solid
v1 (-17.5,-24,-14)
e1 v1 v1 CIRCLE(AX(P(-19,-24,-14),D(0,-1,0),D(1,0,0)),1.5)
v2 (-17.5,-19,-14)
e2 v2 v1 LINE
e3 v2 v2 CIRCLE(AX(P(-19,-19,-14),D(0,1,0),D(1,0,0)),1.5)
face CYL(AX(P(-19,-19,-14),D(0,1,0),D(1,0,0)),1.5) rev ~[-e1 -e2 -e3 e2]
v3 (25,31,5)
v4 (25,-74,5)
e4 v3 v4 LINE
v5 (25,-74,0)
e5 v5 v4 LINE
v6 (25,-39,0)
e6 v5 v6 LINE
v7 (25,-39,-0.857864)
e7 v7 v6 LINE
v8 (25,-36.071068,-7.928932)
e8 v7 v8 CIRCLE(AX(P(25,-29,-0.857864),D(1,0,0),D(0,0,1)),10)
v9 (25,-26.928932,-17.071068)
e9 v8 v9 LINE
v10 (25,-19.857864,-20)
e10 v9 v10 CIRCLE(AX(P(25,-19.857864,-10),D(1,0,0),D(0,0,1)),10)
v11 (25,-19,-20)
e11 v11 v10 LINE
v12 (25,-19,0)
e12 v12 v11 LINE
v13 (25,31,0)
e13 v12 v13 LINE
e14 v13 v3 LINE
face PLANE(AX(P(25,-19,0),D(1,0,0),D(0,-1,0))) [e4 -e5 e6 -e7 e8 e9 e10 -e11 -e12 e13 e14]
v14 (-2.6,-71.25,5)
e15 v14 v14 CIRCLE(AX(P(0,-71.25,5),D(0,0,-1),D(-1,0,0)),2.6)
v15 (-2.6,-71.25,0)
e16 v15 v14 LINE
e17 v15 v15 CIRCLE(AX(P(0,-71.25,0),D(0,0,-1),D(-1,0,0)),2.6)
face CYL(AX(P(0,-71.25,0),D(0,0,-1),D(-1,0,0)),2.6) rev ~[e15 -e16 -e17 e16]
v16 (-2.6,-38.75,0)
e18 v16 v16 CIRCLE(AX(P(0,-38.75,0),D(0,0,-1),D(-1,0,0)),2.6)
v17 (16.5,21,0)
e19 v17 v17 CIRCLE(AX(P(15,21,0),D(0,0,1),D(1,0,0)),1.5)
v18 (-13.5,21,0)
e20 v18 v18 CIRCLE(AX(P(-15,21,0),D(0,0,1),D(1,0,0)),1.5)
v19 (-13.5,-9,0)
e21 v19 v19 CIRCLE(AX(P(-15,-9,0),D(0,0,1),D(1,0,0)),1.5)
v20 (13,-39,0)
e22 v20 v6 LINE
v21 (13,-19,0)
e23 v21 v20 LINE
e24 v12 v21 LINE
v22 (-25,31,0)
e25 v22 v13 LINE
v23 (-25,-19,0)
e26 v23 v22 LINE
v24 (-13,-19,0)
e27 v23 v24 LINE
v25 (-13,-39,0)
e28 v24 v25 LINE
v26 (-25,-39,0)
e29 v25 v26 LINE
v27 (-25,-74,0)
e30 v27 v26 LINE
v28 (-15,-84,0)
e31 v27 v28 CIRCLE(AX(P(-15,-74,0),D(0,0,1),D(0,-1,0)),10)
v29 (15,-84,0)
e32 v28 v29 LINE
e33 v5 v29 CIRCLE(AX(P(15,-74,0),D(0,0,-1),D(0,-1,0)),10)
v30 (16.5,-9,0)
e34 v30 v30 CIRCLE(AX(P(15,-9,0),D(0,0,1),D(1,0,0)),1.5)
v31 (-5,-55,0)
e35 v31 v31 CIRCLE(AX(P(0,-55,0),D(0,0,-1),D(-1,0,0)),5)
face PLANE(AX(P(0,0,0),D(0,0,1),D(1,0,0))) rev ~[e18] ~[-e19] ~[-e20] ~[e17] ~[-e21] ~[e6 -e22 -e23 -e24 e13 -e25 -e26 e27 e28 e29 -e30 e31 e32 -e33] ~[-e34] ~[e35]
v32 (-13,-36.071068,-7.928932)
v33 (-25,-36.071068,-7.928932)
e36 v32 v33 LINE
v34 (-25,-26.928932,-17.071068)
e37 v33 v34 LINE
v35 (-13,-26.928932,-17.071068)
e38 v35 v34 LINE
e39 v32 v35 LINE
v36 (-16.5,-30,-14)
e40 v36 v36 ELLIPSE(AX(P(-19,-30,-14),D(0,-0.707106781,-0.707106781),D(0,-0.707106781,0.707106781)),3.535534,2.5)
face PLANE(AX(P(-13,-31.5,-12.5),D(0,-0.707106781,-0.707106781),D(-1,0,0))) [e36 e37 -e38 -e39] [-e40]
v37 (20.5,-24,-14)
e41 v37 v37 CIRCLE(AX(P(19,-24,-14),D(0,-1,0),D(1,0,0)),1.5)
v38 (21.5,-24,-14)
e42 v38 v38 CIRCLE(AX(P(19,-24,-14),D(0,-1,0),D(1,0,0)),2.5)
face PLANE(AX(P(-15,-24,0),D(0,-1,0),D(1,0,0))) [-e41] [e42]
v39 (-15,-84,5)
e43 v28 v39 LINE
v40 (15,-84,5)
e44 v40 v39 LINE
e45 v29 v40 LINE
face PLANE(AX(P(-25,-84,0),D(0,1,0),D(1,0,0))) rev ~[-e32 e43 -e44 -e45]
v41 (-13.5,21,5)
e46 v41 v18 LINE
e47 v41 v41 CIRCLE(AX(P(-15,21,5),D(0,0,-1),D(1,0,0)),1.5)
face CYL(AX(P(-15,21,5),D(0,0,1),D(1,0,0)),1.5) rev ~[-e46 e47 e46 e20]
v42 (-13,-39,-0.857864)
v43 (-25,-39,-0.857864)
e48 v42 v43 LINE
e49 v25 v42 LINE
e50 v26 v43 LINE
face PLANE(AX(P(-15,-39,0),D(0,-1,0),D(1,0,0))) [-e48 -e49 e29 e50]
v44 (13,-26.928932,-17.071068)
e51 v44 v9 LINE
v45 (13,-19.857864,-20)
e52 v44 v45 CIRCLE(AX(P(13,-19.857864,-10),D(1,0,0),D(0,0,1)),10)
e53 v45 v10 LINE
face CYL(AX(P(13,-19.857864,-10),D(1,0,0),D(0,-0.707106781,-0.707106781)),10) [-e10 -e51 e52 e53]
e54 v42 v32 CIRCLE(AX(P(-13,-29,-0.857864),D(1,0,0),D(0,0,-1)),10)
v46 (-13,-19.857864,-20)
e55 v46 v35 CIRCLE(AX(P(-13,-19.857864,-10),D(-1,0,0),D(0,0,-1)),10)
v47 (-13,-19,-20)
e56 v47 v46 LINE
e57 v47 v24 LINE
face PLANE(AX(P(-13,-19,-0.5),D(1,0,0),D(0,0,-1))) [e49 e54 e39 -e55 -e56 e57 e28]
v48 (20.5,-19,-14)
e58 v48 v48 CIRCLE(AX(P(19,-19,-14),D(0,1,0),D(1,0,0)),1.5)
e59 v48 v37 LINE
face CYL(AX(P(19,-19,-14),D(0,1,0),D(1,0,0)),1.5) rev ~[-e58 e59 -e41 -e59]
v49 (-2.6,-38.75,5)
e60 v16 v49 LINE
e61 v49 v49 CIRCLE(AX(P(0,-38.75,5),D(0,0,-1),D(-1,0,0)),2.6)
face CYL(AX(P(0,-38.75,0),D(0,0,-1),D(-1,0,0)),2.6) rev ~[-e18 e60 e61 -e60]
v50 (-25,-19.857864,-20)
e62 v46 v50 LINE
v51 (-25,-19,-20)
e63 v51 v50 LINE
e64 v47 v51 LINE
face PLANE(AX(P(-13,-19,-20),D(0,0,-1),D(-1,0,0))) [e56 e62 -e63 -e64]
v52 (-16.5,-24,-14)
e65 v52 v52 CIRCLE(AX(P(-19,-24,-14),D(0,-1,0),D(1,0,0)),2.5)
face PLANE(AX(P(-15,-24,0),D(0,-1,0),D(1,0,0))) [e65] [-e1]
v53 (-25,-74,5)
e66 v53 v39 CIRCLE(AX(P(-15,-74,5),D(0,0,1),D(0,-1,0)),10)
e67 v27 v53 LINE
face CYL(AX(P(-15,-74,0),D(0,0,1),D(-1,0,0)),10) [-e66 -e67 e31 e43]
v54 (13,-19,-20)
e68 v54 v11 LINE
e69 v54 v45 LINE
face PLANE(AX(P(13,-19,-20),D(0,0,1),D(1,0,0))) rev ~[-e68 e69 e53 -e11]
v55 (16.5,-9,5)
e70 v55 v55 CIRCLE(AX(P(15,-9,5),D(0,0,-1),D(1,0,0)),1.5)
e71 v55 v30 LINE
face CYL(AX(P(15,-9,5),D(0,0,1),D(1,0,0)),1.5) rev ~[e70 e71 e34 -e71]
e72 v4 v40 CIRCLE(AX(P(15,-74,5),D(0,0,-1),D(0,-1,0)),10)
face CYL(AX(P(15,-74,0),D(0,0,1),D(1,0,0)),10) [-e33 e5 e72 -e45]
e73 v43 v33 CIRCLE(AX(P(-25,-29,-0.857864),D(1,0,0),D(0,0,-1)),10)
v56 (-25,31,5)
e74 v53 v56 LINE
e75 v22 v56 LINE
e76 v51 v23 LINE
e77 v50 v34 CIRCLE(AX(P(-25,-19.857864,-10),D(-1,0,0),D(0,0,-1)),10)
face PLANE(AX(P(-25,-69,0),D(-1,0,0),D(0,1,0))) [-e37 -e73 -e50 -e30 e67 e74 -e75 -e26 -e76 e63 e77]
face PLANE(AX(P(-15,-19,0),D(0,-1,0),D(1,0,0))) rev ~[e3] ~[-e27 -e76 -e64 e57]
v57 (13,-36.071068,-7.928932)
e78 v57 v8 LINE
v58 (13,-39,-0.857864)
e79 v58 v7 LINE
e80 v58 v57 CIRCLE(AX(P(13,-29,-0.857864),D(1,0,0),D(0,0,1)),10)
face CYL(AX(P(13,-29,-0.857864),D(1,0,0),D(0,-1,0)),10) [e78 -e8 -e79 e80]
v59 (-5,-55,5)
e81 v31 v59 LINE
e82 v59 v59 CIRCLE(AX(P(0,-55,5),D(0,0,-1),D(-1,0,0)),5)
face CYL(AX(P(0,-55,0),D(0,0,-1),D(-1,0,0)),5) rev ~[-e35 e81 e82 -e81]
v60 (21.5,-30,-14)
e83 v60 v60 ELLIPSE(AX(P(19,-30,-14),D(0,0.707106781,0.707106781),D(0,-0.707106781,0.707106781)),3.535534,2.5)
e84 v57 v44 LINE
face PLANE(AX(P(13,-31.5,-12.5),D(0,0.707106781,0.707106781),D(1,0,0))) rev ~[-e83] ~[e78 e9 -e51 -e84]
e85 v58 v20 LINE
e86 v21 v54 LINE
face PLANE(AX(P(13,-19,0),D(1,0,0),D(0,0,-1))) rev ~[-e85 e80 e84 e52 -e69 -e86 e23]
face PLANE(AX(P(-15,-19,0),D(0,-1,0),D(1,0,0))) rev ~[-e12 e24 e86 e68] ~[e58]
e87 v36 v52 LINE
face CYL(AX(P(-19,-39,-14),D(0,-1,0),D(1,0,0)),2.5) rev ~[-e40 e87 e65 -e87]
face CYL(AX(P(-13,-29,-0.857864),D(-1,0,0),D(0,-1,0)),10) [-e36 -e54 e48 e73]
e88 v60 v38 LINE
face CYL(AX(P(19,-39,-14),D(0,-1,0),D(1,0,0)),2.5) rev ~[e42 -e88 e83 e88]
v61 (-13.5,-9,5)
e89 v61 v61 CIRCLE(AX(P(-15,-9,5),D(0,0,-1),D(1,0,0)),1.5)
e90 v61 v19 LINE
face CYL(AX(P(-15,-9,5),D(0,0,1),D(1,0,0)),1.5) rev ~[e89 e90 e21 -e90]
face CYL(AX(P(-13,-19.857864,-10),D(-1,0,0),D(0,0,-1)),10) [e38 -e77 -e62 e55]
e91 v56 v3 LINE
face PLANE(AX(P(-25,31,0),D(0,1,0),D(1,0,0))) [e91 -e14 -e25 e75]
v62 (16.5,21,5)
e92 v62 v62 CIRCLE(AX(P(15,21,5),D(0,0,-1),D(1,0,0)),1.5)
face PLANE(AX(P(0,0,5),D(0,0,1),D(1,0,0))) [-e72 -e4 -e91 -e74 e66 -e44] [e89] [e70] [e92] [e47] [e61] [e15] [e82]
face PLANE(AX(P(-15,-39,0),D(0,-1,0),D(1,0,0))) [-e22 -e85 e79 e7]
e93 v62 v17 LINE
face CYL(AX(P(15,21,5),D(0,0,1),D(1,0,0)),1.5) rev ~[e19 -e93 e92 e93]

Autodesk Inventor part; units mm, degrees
ref_plane "YZ Plane" through (0, 0, 0) normal (1, 0, 0) x (0, 1, 0)
ref_plane "XZ Plane" through (0, 0, 0) normal (0, 1, 0) x (-1, 0, 0)
ref_plane "XY Plane" through (0, 0, 0) normal (0, 0, 1) x (1, 0, 0)
sketch "Sketch1" plane through (0, 0, 0) normal (0, 0, 1) x (1, 0, 0)
  line L0 (25, -19) -> (-25, -19) projected
  line L1 (-25, 31) -> (25, 31)
  line L2 (25, 31) -> (25, -69)
  line L3 (25, -69) -> (-25, -69)
  line L4 (-25, -69) -> (-25, 31)
  line L5 (-25, 31) -> (25, -69) construction
  line L6 (25, 31) -> (-25, -69) construction
  line L7 (25, -69) -> (-25, -69)
  line L8 (-25, -69) -> (-25, -119)
  line L9 (-25, -119) -> (25, -119)
  line L10 (25, -119) -> (25, -69)
  point P0 (0, 0)
  point P1 (0, -19)
  dimension "d0" = 50
  dimension "d1" = 100
  dimension "d2" = 50
  dimension "d3" = 50
extrude "Extrusion1" add sketch "Sketch1" along normal blind 5
fillet "Fillet1" radius 10 2 edges at (25, -119, 2.5) (-25, -119, 2.5)
ref_plane "Work Plane1" through (-15, -19, 0) normal (0, -1, 0) x (1, 0, 0)
sketch "Sketch2" plane through (-15, -19, 0) normal (0, -1, 0) x (1, 0, 0)
  line L0 (40, -0.5) -> (-10, -0.5) projected
  line L1 (-10, -0.5) -> (-10, -3.5) projected
  line L2 (40, -3.5) -> (-10, -3.5) projected
  line L3 (40, -0.5) -> (40, -3.5) projected
  line L4 (-10, -3.5) -> (40, -3.5) projected
  line L5 (-10, -3.5) -> (-10, -53.5) projected
  line L6 (-10, -53.5) -> (40, -53.5) projected
  line L7 (40, -53.5) -> (40, -3.5) projected
  line L8 (40, -3.5) -> (-10, -3.5) projected
  ellipse E0 centre (15, -28.5) end of major axis (18.5, -28.5) minor radius 3.5 projected
  line L9 (-10, 0) -> (0, 0) projected
  line L10 (40, 0) -> (-10, 0) projected
  line L11 (30, 0) -> (40, 0) projected
  line L12 (0, 0) -> (30, 0) projected
  line L13 (25, -0.5) -> (5, -0.5) projected
  line L14 (5, -0.5) -> (5, -20.5) projected
  line L15 (25, -20.5) -> (5, -20.5) projected
  line L16 (25, -0.5) -> (25, -20.5) projected
  line L17 (40, 0) -> (28, 0)
  line L18 (28, 0) -> (28, -20)
  line L19 (28, -20) -> (40, -20)
  line L20 (40, -20) -> (40, 0)
  line L21 (-10, 0) -> (2, 0)
  line L22 (2, 0) -> (2, -20)
  line L23 (2, -20) -> (-10, -20)
  line L24 (-10, -20) -> (-10, 0)
  point P0 (15, 0)
  dimension "d8" = 12
  dimension "d9" = 20
  dimension "d10" = 12
  dimension "d11" = 20
extrude "Extrusion2" add sketch "Sketch2" along normal blind 20 contours L18 L10 L20 L0 | L0 L3 L2 L18 | L22 L2 L1 L0 | L0 L24 L9 L10 L22 | L2 L7 L19 L18 | L22 L23 L5 L2
chamfer "Chamfer1" distance 15 angle 45 2 edges at (-19, -39, -20) (19, -39, -20)
fillet "Fillet2" radius 10 2 edges at (-19, -24, -20) (-19, -39, -5)
fillet "Fillet3" radius 10 2 edges at (19, -39, -5) (19, -24, -20)
sketch "Sketch3" plane through (0, 0, 5) normal (0, 0, 1) x (1, 0, 0)
  line L0 (25, -109) -> (25, 31) projected
  line L1 (-25, 31) -> (-25, -109) projected
  line L2 (25, 31) -> (-25, 31)
  line L3 (-25, 31) -> (-25, -19)
  line L4 (-25, -19) -> (25, -19)
  line L5 (25, -19) -> (25, 31)
  line L6 (-15, 51) -> (15, 51)
  line L7 (15, 51) -> (15, 21)
  line L8 (15, 21) -> (-15, 21)
  line L9 (-15, 21) -> (-15, 51)
  line L10 (-15, 51) -> (15, 21) construction
  line L11 (15, 51) -> (-15, 21) construction
  circle A0 centre (15, 21) radius 1.5
  circle A1 centre (15, 51) radius 1.5
  circle A2 centre (-15, 51) radius 1.5
  circle A3 centre (-15, 21) radius 1.5
  point P0 (0, 0)
  point P1 (0, 36)
  dimension "d19" = 50
  dimension "d20" = 30
  dimension "d21" = 30
  dimension "d22" = 3
  dimension "d23" = 3
  dimension "d24" = 3
  dimension "d25" = 3
extrude "Extrusion3" cut sketch "Sketch3" against normal blind 20 contours A1 L6 L7 | L7 L6 A1 | A0 L8 L7 | L7 L8 A0 | A3 L8 L9 | L9 L8 A3 | A2 L6 L9 | L9 L6 A2
sketch "Sketch4" plane through (-15, -19, 0) normal (0, 1, 0) x (1, 0, 0)
  line L0 (-10, 0) -> (-10, 20) projected
  line L1 (-10, 20) -> (2, 20)
  line L2 (2, 20) -> (2, 8)
  line L3 (2, 8) -> (-10, 8)
  line L4 (-10, 8) -> (-10, 20)
  circle A0 centre (-4, 14) radius 1.5
  circle A1 centre (34, 14) radius 1.5
  point P0 (15, 0)
  dimension "d28" = 12
  dimension "d29" = 12
  dimension "d30" = 3
  dimension "d33" = 38
extrude "Extrusion4" cut sketch "Sketch4" against normal through all contours A0 | A1
sketch "Sketch5" plane through (-15, -39, 0) normal (0, -1, 0) x (1, 0, 0)
  circle A0 centre (34, -14) radius 1.5 projected
  circle A1 centre (-4, -14) radius 1.5 projected
  circle A2 centre (34, -14) radius 2.5
  circle A3 centre (-4, -14) radius 1.5 projected
  circle A4 centre (-4, -14) radius 2.5
  point P0 (15, 0)
  dimension "d40" = 5
  dimension "d41" = 5
extrude "Extrusion5" cut sketch "Sketch5" against normal blind 15
sketch "Sketch6" plane through (0, 0, 0) normal (0, 0, -1) x (-1, 0, 0)
  circle A0 centre (0, -55) radius 5
  circle A1 centre (0, -38.75) radius 2.6
  circle A2 centre (0, -71.25) radius 2.6
  point P0 (0, 0)
  dimension "d44" = 10
  dimension "d45" = 16.25
  dimension "d46" = 16.25
  dimension "d47" = 5.2
  dimension "d48" = 5.2
  dimension "d51" = 55
extrude "Extrusion6" cut sketch "Sketch6" against normal blind 15
sketch "Sketch7" plane through (0, 0, 0) normal (0, 0, -1) x (-1, 0, 0)
  line L0 (25, 31) -> (25, -109) projected
  line L1 (25, -84) -> (-25, -84)
  line L2 (-25, -109) -> (-25, 31) projected
  line L3 (25, -84) -> (75, -84) construction
  line L4 (15, -119) -> (-15, -119) projected
  circle A0 centre (0, -71.25) radius 2.6 projected
  circle A1 centre (0, -38.75) radius 2.6 projected
  circle A2 centre (0, -55) radius 5 projected
  circle A3 centre (15, 21) radius 1.5 projected
  circle A4 centre (-15, 21) radius 1.5 projected
  line L5 (-13, -39) -> (-25, -39) projected
  line L6 (-25, -109) -> (-25, -39) projected
  arc A5 (-25, -109) -> (-15, -119) centre (-15, -109) ccw projected
  line L7 (15, -119) -> (-15, -119) projected
  arc A6 (15, -119) -> (25, -109) centre (15, -109) ccw projected
  line L8 (25, -39) -> (25, -109) projected
  line L9 (25, -39) -> (13, -39) projected
  line L10 (13, -39) -> (13, -19) projected
  line L11 (13, -19) -> (25, -19) projected
  line L12 (25, 31) -> (25, -19) projected
  line L13 (-25, 31) -> (25, 31) projected
  line L14 (-25, -19) -> (-25, 31) projected
  line L15 (-25, -19) -> (-13, -19) projected
  line L16 (-13, -19) -> (-13, -39) projected
  point P0 (0, 0)
  point P1 (-15, -119)
  point P2 (15, -119)
  dimension "d52" = 50
  dimension "d53" = 180
  dimension "d54" = 35
extrude "Extrusion7" cut sketch "Sketch7" against normal blind 15 contours L0 L9 L10 L11 | L15 L16 L5 L2 | L0 A6 L4 A5 L2 L1
fillet "Fillet4" radius 10 2 edges at (25, -84, 2.5) (-25, -84, 2.5)
sketch "Sketch8" plane through (13, -19, 0) normal (0, -1, 0) x (1, 0, 0)
  line L0 (0, 5) -> (12, 5) projected
  line L1 (0, 0) -> (0, 5) projected
  line L2 (12, 0) -> (0, 0) projected
  line L3 (12, 5) -> (12, 0) projected
  line L4 (-38, 5) -> (-26, 5) projected
  line L5 (-38, 0) -> (-38, 5) projected
  line L6 (-26, 0) -> (-38, 0) projected
  line L7 (-26, 0) -> (-26, 5) projected
  point P0 (-13, 0)
extrude "Extrusion8" add sketch "Sketch8" along normal up to surface (20 mm away)
sketch "Sketch9" plane through (0, 0, 5) normal (0, 0, 1) x (1, 0, 0)
  circle A0 centre (15, 21) radius 1.5 projected
  line L0 (15, 21) -> (-15, 21)
  line L1 (-15, 21) -> (-15, -9)
  line L2 (-15, -9) -> (15, -9)
  line L3 (15, -9) -> (15, 21)
  circle A1 centre (15, -9) radius 1.5
  circle A2 centre (-15, -9) radius 1.5
  point P0 (0, 0)
  dimension "d60" = 30
  dimension "d61" = 3
  dimension "d62" = 3
extrude "Extrusion9" cut sketch "Sketch9" against normal through all contours A1 L2 L3 | L3 L2 A1 | A2 L2 L1 | L1 L2 A2
properties part number "3d mount for linear bearing"
